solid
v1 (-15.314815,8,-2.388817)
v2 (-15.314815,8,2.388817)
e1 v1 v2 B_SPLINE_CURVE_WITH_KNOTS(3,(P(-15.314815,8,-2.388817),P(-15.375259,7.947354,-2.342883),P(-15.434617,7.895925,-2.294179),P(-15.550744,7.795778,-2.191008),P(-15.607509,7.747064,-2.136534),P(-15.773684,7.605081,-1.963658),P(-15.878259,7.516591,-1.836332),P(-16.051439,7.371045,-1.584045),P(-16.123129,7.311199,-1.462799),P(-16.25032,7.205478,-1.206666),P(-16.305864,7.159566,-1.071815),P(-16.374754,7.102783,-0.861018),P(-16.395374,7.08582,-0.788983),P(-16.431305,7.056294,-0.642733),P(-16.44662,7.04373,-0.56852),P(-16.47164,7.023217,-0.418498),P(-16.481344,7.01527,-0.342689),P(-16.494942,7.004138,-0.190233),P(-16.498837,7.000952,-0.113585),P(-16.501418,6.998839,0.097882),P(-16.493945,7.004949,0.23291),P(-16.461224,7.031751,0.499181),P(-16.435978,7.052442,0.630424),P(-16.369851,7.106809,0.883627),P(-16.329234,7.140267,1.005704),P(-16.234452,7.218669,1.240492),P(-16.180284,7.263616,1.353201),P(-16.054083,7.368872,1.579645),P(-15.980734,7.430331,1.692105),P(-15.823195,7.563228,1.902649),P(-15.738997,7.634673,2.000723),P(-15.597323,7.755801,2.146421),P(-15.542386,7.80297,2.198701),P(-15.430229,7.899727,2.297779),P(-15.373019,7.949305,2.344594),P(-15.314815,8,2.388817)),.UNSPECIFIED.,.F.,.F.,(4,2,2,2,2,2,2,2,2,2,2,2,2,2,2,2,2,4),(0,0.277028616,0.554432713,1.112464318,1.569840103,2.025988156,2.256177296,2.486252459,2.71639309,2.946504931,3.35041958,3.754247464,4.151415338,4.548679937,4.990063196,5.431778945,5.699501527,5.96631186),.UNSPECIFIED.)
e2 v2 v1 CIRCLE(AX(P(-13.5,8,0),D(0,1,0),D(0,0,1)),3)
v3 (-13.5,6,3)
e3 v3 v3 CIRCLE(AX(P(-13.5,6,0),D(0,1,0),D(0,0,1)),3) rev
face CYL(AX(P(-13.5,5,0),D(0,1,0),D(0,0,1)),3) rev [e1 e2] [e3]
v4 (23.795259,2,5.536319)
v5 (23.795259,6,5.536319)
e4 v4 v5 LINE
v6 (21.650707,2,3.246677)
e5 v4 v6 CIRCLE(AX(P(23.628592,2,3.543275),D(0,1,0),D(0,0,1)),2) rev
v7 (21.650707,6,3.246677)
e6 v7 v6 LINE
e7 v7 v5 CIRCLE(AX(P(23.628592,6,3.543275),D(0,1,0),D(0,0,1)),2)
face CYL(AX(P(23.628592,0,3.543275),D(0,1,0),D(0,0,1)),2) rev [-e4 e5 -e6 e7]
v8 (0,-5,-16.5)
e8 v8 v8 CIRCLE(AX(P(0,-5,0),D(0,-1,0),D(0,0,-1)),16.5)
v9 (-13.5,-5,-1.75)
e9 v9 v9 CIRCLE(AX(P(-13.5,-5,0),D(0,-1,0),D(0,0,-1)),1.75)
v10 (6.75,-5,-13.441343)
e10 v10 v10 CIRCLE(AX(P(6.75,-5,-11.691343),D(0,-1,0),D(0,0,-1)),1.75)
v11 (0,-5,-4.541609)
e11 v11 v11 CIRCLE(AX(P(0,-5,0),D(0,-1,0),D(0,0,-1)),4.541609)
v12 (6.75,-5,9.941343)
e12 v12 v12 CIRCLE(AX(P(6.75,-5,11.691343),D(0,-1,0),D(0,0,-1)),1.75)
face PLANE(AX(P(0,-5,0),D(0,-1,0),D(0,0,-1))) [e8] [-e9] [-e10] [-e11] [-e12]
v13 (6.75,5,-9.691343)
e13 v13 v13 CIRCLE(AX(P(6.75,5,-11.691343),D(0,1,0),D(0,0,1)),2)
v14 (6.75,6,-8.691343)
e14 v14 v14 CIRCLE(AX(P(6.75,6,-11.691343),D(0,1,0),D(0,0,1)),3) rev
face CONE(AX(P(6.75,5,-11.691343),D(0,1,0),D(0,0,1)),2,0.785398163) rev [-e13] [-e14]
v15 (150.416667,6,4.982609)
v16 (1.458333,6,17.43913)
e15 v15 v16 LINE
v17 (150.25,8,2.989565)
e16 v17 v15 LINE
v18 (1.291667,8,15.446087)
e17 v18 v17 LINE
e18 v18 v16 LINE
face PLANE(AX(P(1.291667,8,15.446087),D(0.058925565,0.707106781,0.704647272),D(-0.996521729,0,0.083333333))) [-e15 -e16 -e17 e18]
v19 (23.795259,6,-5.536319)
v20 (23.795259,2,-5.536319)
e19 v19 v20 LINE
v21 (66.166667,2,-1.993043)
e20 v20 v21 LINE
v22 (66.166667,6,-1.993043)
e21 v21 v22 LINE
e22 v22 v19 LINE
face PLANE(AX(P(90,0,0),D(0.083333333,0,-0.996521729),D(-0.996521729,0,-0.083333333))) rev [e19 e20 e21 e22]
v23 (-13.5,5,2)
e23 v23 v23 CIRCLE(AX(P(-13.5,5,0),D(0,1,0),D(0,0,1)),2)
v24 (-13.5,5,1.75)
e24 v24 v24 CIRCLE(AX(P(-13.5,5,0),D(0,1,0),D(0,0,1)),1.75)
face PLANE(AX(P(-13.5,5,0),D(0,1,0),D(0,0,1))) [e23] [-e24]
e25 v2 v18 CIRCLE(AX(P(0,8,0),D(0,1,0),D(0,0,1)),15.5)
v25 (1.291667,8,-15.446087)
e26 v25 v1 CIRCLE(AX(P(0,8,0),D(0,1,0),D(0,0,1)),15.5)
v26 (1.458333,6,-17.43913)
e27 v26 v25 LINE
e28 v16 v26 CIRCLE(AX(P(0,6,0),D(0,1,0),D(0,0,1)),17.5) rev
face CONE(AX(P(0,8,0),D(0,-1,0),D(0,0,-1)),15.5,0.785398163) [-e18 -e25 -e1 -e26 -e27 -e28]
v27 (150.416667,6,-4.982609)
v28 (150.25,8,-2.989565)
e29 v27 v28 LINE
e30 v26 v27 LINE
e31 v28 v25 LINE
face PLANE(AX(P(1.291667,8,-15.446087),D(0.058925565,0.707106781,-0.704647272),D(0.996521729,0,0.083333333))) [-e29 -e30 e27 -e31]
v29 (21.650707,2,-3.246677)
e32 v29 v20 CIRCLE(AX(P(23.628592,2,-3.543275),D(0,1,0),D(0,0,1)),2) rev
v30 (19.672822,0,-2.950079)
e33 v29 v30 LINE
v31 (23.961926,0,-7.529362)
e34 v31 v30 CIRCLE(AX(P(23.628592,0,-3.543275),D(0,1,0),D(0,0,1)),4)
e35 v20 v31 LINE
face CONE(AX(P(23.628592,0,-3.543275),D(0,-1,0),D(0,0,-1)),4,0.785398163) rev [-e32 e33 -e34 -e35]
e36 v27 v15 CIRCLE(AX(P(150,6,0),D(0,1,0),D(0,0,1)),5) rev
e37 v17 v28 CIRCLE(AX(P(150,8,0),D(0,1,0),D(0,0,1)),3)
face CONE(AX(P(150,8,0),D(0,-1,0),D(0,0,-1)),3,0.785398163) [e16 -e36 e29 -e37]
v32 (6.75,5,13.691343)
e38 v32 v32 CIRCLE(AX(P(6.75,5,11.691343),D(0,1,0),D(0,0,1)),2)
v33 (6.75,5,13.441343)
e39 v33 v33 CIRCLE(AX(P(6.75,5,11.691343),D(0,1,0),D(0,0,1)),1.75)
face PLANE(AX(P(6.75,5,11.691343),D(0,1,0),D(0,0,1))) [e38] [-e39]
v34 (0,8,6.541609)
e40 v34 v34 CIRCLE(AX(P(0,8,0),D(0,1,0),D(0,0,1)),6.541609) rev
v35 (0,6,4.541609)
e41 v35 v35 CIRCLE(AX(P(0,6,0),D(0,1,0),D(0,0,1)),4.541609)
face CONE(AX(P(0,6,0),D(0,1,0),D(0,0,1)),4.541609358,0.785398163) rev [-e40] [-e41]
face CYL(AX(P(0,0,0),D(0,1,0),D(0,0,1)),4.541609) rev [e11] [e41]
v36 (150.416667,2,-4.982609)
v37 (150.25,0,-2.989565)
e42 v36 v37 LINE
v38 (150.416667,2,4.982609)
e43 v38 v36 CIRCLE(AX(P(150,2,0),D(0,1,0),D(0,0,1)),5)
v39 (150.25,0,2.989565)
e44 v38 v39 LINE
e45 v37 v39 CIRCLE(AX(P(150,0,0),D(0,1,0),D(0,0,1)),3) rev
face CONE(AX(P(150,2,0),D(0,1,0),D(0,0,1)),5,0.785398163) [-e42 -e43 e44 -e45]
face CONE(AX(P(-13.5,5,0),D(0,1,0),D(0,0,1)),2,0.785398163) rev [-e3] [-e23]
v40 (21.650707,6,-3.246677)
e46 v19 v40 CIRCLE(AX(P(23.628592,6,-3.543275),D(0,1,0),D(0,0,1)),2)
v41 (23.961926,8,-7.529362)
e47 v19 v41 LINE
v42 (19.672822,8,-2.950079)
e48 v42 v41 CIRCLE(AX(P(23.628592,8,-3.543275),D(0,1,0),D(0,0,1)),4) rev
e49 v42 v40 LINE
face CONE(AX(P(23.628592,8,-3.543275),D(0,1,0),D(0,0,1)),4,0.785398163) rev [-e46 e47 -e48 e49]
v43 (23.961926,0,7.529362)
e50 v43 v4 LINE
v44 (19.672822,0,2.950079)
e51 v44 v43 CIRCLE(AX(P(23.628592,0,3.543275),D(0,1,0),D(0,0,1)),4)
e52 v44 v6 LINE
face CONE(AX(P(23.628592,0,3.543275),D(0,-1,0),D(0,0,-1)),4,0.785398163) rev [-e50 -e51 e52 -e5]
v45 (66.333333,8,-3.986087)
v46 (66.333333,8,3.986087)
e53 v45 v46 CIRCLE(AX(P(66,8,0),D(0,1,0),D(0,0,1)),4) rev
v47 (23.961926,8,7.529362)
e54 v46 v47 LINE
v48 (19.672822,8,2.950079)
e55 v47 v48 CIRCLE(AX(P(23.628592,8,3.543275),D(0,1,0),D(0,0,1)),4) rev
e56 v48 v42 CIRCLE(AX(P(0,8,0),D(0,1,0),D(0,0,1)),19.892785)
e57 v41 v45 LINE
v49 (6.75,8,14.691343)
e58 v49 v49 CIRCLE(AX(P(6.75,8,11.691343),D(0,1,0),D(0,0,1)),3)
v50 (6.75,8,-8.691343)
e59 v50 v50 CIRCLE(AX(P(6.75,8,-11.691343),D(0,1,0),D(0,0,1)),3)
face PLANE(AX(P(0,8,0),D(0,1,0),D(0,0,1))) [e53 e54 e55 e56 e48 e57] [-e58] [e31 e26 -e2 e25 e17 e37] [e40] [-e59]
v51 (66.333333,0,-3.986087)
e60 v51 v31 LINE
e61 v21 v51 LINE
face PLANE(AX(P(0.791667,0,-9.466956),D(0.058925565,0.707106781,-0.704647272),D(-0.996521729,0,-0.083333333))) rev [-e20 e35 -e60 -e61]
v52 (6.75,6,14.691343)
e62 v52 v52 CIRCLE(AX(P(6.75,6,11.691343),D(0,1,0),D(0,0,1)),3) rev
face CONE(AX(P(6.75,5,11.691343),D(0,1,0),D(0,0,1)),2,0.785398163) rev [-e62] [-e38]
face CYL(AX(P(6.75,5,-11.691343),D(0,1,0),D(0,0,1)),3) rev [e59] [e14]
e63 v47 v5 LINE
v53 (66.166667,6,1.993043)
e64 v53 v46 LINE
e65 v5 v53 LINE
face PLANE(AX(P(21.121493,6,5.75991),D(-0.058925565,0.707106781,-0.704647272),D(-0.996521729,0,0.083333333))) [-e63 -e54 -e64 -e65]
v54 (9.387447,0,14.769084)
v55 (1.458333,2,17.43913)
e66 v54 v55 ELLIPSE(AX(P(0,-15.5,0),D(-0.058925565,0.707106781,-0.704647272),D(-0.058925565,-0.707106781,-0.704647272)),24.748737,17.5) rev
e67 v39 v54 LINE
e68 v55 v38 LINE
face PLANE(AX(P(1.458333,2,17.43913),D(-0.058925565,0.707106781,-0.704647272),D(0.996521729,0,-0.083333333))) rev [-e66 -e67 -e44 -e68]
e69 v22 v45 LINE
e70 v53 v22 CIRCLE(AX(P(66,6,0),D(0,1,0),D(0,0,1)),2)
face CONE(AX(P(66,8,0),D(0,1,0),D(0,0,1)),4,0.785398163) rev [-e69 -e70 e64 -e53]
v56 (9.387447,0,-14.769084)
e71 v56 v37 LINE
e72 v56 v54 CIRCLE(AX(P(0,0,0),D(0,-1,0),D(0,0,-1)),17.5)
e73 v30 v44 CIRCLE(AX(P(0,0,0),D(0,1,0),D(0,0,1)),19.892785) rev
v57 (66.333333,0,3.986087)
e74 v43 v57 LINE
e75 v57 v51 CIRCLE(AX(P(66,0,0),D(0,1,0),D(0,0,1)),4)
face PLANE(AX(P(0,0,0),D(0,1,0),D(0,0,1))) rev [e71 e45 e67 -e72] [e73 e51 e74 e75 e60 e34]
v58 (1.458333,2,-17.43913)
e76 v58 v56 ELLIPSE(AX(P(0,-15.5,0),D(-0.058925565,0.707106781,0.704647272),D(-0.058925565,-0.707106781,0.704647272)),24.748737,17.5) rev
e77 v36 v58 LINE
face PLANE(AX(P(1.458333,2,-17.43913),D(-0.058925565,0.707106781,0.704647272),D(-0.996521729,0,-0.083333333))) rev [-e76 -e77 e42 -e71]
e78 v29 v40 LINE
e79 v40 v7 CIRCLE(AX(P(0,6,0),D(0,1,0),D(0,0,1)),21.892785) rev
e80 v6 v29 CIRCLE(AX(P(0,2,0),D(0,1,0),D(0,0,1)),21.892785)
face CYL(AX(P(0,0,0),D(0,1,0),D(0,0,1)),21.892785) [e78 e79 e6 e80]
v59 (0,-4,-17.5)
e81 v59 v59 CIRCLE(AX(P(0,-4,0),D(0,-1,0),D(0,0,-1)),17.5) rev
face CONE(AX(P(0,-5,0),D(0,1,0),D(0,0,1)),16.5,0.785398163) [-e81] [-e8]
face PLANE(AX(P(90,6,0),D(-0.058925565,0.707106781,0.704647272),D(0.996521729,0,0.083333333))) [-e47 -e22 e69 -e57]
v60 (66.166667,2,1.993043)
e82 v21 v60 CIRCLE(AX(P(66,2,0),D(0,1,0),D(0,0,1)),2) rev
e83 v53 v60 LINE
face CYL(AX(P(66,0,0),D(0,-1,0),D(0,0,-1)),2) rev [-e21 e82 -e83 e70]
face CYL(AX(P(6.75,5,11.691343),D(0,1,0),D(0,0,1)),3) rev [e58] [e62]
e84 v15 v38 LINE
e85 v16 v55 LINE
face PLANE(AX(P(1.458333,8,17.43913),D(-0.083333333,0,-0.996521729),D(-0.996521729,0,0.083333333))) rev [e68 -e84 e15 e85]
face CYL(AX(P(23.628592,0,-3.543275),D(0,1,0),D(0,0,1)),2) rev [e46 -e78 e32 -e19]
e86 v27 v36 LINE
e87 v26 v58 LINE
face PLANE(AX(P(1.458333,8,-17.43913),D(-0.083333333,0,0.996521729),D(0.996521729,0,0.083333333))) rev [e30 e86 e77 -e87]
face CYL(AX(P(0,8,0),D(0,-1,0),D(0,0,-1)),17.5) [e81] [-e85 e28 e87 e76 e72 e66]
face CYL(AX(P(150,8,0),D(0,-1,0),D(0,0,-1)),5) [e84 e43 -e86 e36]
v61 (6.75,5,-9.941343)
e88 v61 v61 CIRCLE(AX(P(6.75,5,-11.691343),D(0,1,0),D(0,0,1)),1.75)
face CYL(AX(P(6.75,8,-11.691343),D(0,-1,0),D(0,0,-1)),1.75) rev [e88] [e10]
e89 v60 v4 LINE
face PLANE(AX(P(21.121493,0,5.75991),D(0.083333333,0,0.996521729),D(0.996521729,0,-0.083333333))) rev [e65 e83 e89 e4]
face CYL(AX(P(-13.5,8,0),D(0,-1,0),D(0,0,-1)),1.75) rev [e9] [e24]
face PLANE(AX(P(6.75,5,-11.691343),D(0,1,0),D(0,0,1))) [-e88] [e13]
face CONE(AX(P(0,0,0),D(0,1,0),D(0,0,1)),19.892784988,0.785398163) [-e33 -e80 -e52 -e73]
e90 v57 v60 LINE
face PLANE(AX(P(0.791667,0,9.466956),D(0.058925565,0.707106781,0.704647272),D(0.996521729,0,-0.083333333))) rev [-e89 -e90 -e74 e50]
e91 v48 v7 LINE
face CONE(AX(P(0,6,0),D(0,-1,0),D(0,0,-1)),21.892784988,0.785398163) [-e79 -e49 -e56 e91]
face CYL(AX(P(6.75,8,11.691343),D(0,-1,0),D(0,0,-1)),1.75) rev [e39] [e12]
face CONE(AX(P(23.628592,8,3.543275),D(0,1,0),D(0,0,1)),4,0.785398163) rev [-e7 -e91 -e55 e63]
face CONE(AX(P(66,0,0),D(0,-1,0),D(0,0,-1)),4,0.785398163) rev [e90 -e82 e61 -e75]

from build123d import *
from build123d.topology import SkipClean

# Parameters (mm, degrees)
SKETCH1_R           = 1.75
BOSS_EXTRUDE1_DEPTH = 8
SKETCH2_R           = 3
CUT_EXTRUDE1_DEPTH  = 3
CUT_EXTRUDE2_DEPTH  = 157.189788399
FILLET1_R           = 2
CHAMFER1_SIZE       = 1
SKETCH4_R           = 4.541609358
CUT_EXTRUDE3_DEPTH  = 157.189788399
BOSS_EXTRUDE2_START = 5
SKETCH5_R           = 17.5
SKETCH5_R_2         = 4.541609358
SKETCH5_R_3         = 1.75
BOSS_EXTRUDE2_DEPTH = 5
CHAMFER2_SIZE       = 2
CHAMFER3_SIZE       = 1


with BuildPart() as part:
    # Sketch1 → Boss-Extrude1 (new body)
    with BuildSketch(Plane(origin=(0, 0, 0), x_dir=(1, 0, 0), z_dir=(0, 1, 0))):
        with BuildLine():
            Line((1.458333333, 17.43913025), (150.416666667, 4.982608643))
            ThreePointArc((150.416666667, 4.982608643), (155, 0), (150.416666667, -4.982608643))
            Line((150.416666667, -4.982608643), (1.458333333, -17.43913025))
            ThreePointArc((1.458333333, -17.43913025), (-17.5, 0), (1.458333333, 17.43913025))
        make_face()
        with Locations(Location((6.75, 11.691342951, 0), (0, 0, 270))):
            Circle(SKETCH1_R, mode=Mode.SUBTRACT)
        with Locations(Location((-13.5, 0, 0), (0, 0, 270))):
            Circle(SKETCH1_R, mode=Mode.SUBTRACT)
        with Locations(Location((6.75, -11.691342951, 0), (0, 0, 270))):
            Circle(SKETCH1_R, mode=Mode.SUBTRACT)
    extrude(amount=BOSS_EXTRUDE1_DEPTH)

    # Sketch2 → Cut-Extrude1 (cut)
    with BuildSketch(Plane(origin=(0, 8, 0), x_dir=(1, 0, 0), z_dir=(0, 1, 0))):
        with Locations(Location((6.75, -11.691342951, 0), (0, 0, 270))):
            Circle(SKETCH2_R)
        with Locations(Location((6.75, 11.691342951, 0), (0, 0, 270))):
            Circle(SKETCH2_R)
        with Locations(Location((-13.5, 0, 0), (0, 0, 270))):
            Circle(SKETCH2_R)
    extrude(amount=-CUT_EXTRUDE1_DEPTH, mode=Mode.SUBTRACT)

    # Sketch3 → Cut-Extrude2 (cut, through all)
    with BuildSketch(Plane(origin=(0, 8, 0), x_dir=(1, 0, 0), z_dir=(0, 1, 0))):
        with BuildLine():
            Line((21.121493084, -5.759910107), (90, 0))
            Line((90, 0), (21.121493084, 5.759910107))
            ThreePointArc((21.121493084, 5.759910107), (21.892784988, 0), (21.121493084, -5.759910107))
        make_face()
    extrude(amount=-CUT_EXTRUDE2_DEPTH, mode=Mode.SUBTRACT)

    # Fillet1
    fillet1_edges = [part.edges().sort_by_distance(p)[0] for p in [
        (21.121493084, 4, 5.759910107),
        (21.121493084, 4, -5.759910107),
        (90, 4, 0),
    ]]
    fillet(fillet1_edges, radius=FILLET1_R)

    # Chamfer1
    chamfer1_edges = [part.edges().sort_by_distance(p)[0] for p in [
        (6.75, 5, 8.691342951),
        (6.75, 5, -14.691342951),
        (-13.5, 5, -3),
    ]]
    chamfer(chamfer1_edges, length=CHAMFER1_SIZE)

    # Sketch4 → Cut-Extrude3 (cut, through all)
    with BuildSketch(Plane(origin=(0, 8, 0), x_dir=(1, 0, 0), z_dir=(0, 1, 0))):
        with Locations(Location((0, 0, 0), (0, 0, 270))):
            Circle(SKETCH4_R)
    extrude(amount=-CUT_EXTRUDE3_DEPTH, mode=Mode.SUBTRACT)

    # Sketch5 → Boss-Extrude2 (add)
    with SkipClean():  # the faces are left unmerged after this step: merging them gives an invalid solid
        with BuildSketch(Plane.XZ.offset(BOSS_EXTRUDE2_START)):
            with Locations(Location((0, 0, 0), (0, 0, 270))):
                Circle(SKETCH5_R)
            with Locations(Location((0, 0, 0), (0, 0, 90))):
                Circle(SKETCH5_R_2, mode=Mode.SUBTRACT)
            with Locations(Location((6.75, 11.691342951, 0), (0, 0, 270))):
                Circle(SKETCH5_R_3, mode=Mode.SUBTRACT)
            with Locations(Location((6.75, -11.691342951, 0), (0, 0, 270))):
                Circle(SKETCH5_R_3, mode=Mode.SUBTRACT)
            with Locations(Location((-13.5, 0, 0), (0, 0, 270))):
                Circle(SKETCH5_R_3, mode=Mode.SUBTRACT)
        extrude(amount=-BOSS_EXTRUDE2_DEPTH)

    # Chamfer2
    # the kernel refuses this chamfer: 2 mm, written as the material it takes off along each edge
    with BuildSketch(Plane(origin=(150, 8, 0), x_dir=(0.0833333333333315, 0, -0.9965217285917835), z_dir=(-0.9965217285917835, 0, -0.0833333333333315))) as chamfer2_piece_1:
        Polygon((5 - CHAMFER2_SIZE, 0), (5, CHAMFER2_SIZE), (5, 0), align=None)
    revolve(axis=Axis((150, 8, 0), (0, -1, 0)), revolution_arc=170.439616306, mode=Mode.SUBTRACT)
    with BuildSketch(Plane(origin=(1.458333333, 8, -17.43913025), x_dir=(-0.08330182640927465, 0.027495876610586497, 0.9961449605786772), z_dir=(0.9965217285917832, 0, 0.08333333333333327)), Plane(origin=(150.416666667, 8, 4.982608643), x_dir=(-0.08330182640927465, 0.027495876610586487, -0.9961449605786772), z_dir=(-0.9965217285917832, 0, 0.08333333333333327))) as chamfer2_piece_2:
        Polygon((CHAMFER2_SIZE * 0.999621916911, CHAMFER2_SIZE * 0.0274958766106), (-CHAMFER2_SIZE * 0.0274958766106, CHAMFER2_SIZE * 0.999621916911), (0, 0), align=None)
    extrude(amount=149.478259289, mode=Mode.SUBTRACT)
    with BuildSketch(Plane(origin=(0, 8, 0), x_dir=(0.08333333333333347, 0, 0.9965217285917832), z_dir=(0.9965217285917832, 0, -0.08333333333333347))) as chamfer2_piece_3:
        Polygon((17.5 - CHAMFER2_SIZE, 0), (17.5, CHAMFER2_SIZE), (17.5, 0), align=None)
    revolve(axis=Axis((0, 8, 0), (0, -1, 0)), revolution_arc=189.560383694, mode=Mode.SUBTRACT)
    with BuildSketch(Plane(origin=(-3.66714262, 0, -17.867744082), x_dir=(0.0022913230508821315, 0.9996219169112968, -0.02740023848912714), z_dir=(0.9965217285917832, 0, 0.08333333333333327))) as chamfer2_piece_4_section:
        Polygon((CHAMFER2_SIZE * 0.999621916911, CHAMFER2_SIZE * 0.0274958766106), (-CHAMFER2_SIZE * 0.0274958766106, CHAMFER2_SIZE * 0.999621916911), (0, 0), align=None)
    chamfer2_piece_4 = extrude(amount=154.621625265, mode=Mode.PRIVATE)
    chamfer2_piece_4 = chamfer2_piece_4 - Plane(origin=(0, 0.665713583, 0), x_dir=(0, 0, -1), z_dir=(0, -1, 0)) * Cylinder(17.5, 318, mode=Mode.PRIVATE)
    add(chamfer2_piece_4, mode=Mode.SUBTRACT)
    with BuildSketch(Plane(origin=(150, 0, 0), x_dir=(0.0833333333333315, 0, -0.9965217285917835), z_dir=(-0.9965217285917835, 0, -0.0833333333333315))) as chamfer2_piece_5:
        Polygon((5, -CHAMFER2_SIZE), (5 - CHAMFER2_SIZE, 0), (5, 0), align=None)
    revolve(axis=Axis((150, 0, 0), (0, -1, 0)), revolution_arc=170.439616306, mode=Mode.SUBTRACT)
    with BuildSketch(Plane(origin=(66.166666667, 8, -1.993043457), x_dir=(0.08330182640927462, 0.02749587661058648, -0.9961449605786772), z_dir=(-0.9965217285917832, 0, -0.08333333333333323)), Plane(origin=(23.795259007, 8, 5.536318568), x_dir=(0.08330182640927467, 0.027495876610586473, 0.9961449605786772), z_dir=(0.9965217285917832, 0, -0.08333333333333327))) as chamfer2_piece_6:
        Polygon((CHAMFER2_SIZE * 0.999621916911, CHAMFER2_SIZE * 0.0274958766106), (-CHAMFER2_SIZE * 0.0274958766106, CHAMFER2_SIZE * 0.999621916911), (0, 0), align=None)
    extrude(amount=42.51930133, mode=Mode.SUBTRACT)
    with BuildSketch(Plane(origin=(23.795259007, 0, -5.536318568), x_dir=(-0.002291323050882199, 0.9996219169112968, 0.027400238489127964), z_dir=(0.9965217285917832, 0, 0.08333333333333323)), Plane(origin=(66.166666667, 0, 1.993043457), x_dir=(-0.002291323050882194, 0.9996219169112968, -0.027400238489127888), z_dir=(-0.9965217285917832, 0, 0.08333333333333327))) as chamfer2_piece_7:
        Polygon((CHAMFER2_SIZE * 0.999621916911, -CHAMFER2_SIZE * 0.0274958766106), (-CHAMFER2_SIZE * 0.0274958766106, -CHAMFER2_SIZE * 0.999621916911), (0, 0), align=None)
    extrude(amount=42.51930133, mode=Mode.SUBTRACT)
    with BuildSketch(Plane(origin=(150.416666667, 0, 4.982608643), x_dir=(0.002291323050882236, 0.9996219169112968, 0.027400238489128394), z_dir=(-0.9965217285917832, 0, 0.08333333333333327))) as chamfer2_piece_8_section:
        Polygon((CHAMFER2_SIZE * 0.999621916911, CHAMFER2_SIZE * 0.0274958766106), (-CHAMFER2_SIZE * 0.0274958766106, CHAMFER2_SIZE * 0.999621916911), (0, 0), align=None)
    chamfer2_piece_8 = extrude(amount=154.621625265, mode=Mode.PRIVATE)
    chamfer2_piece_8 = chamfer2_piece_8 - Plane(origin=(0, 0.665713582, 0), x_dir=(0, 0, -1), z_dir=(0, -1, 0)) * Cylinder(17.5, 318, mode=Mode.PRIVATE)
    add(chamfer2_piece_8, mode=Mode.SUBTRACT)
    with BuildSketch(Plane(origin=(0, 8, 0), x_dir=(0.9889425762591825, 0, -0.14829895772341384), z_dir=(-0.14829895772341384, 0, -0.9889425762591825))) as chamfer2_piece_9:
        Polygon((21.892784988 - CHAMFER2_SIZE, 0), (21.892784988, CHAMFER2_SIZE), (21.892784988, 0), align=None)
    revolve(axis=Axis((0, 8, 0), (0, -1, 0)), revolution_arc=17.056723038, mode=Mode.SUBTRACT)
    with BuildSketch(Plane(origin=(0, 0, 0), x_dir=(0.9889425762591825, 0, 0.14829895772341486), z_dir=(-0.14829895772341486, 0, 0.9889425762591825))) as chamfer2_piece_10:
        Polygon((21.892784988, CHAMFER2_SIZE), (21.892784988 - CHAMFER2_SIZE, 0), (21.892784988, 0), align=None)
    revolve(axis=Axis((0, 0, 0), (0, 1, 0)), revolution_arc=17.056723038, mode=Mode.SUBTRACT)
    with BuildSketch(Plane(origin=(66, 8, 0), x_dir=(0.0833333333333357, 0, 0.996521728591783), z_dir=(-0.996521728591783, 0, 0.0833333333333357))) as chamfer2_piece_11:
        Polygon((2 + CHAMFER2_SIZE, 0), (2, -CHAMFER2_SIZE), (2, 0), align=None)
    revolve(axis=Axis((66, 8, 0), (0, 1, 0)), revolution_arc=170.439616306, mode=Mode.SUBTRACT)
    with BuildSketch(Plane(origin=(66, 0, 0), x_dir=(0.0833333333333357, 0, 0.996521728591783), z_dir=(-0.996521728591783, 0, 0.0833333333333357))) as chamfer2_piece_12:
        Polygon((2, CHAMFER2_SIZE), (2 + CHAMFER2_SIZE, 0), (2, 0), align=None)
    revolve(axis=Axis((66, 0, 0), (0, 1, 0)), revolution_arc=170.439616306, mode=Mode.SUBTRACT)
    with BuildSketch(Plane(origin=(23.62859234, 8, 3.543275111), x_dir=(0.08333333333333393, 0, 0.9965217285917831), z_dir=(0.9965217285917831, 0, -0.08333333333333393))) as chamfer2_piece_13:
        Polygon((2 + CHAMFER2_SIZE, 0), (2, CHAMFER2_SIZE), (2, 0), align=None)
    revolve(axis=Axis((23.62859234, 8, 3.543275111), (0, -1, 0)), revolution_arc=103.308553366, mode=Mode.SUBTRACT)
    with BuildSketch(Plane(origin=(23.62859234, 0, 3.543275111), x_dir=(0.08333333333333393, 0, 0.9965217285917831), z_dir=(0.9965217285917831, 0, -0.08333333333333393))) as chamfer2_piece_14:
        Polygon((2, -CHAMFER2_SIZE), (2 + CHAMFER2_SIZE, 0), (2, 0), align=None)
    revolve(axis=Axis((23.62859234, 0, 3.543275111), (0, -1, 0)), revolution_arc=103.308553366, mode=Mode.SUBTRACT)
    with BuildSketch(Plane(origin=(23.62859234, 8, -3.543275111), x_dir=(-0.9889425762591827, 0, 0.14829895772341356), z_dir=(0.14829895772341356, 0, 0.9889425762591827))) as chamfer2_piece_15:
        Polygon((2 + CHAMFER2_SIZE, 0), (2, CHAMFER2_SIZE), (2, 0), align=None)
    revolve(axis=Axis((23.62859234, 8, -3.543275111), (0, -1, 0)), revolution_arc=103.308553366, mode=Mode.SUBTRACT)
    with BuildSketch(Plane(origin=(23.62859234, 0, -3.543275111), x_dir=(-0.9889425762591827, 0, 0.14829895772341356), z_dir=(0.14829895772341356, 0, 0.9889425762591827))) as chamfer2_piece_16:
        Polygon((2, -CHAMFER2_SIZE), (2 + CHAMFER2_SIZE, 0), (2, 0), align=None)
    revolve(axis=Axis((23.62859234, 0, -3.543275111), (0, -1, 0)), revolution_arc=103.308553366, mode=Mode.SUBTRACT)
    with BuildSketch(Plane(origin=(0, 8, 0), x_dir=(0, 0, 1), z_dir=(-1, 0, 0))) as chamfer2_piece_17:
        Polygon((4.541609358 + CHAMFER2_SIZE, 0), (4.541609358, -CHAMFER2_SIZE), (4.541609358, 0), align=None)
    revolve(axis=Axis((0, 8, 0), (0, 1, 0)), mode=Mode.SUBTRACT)

    # Chamfer3
    chamfer3_edges = [part.edges().sort_by_distance(p)[0] for p in [
        (0, -5, 17.5),
    ]]
    chamfer(chamfer3_edges, length=CHAMFER3_SIZE)


solid = part.part
